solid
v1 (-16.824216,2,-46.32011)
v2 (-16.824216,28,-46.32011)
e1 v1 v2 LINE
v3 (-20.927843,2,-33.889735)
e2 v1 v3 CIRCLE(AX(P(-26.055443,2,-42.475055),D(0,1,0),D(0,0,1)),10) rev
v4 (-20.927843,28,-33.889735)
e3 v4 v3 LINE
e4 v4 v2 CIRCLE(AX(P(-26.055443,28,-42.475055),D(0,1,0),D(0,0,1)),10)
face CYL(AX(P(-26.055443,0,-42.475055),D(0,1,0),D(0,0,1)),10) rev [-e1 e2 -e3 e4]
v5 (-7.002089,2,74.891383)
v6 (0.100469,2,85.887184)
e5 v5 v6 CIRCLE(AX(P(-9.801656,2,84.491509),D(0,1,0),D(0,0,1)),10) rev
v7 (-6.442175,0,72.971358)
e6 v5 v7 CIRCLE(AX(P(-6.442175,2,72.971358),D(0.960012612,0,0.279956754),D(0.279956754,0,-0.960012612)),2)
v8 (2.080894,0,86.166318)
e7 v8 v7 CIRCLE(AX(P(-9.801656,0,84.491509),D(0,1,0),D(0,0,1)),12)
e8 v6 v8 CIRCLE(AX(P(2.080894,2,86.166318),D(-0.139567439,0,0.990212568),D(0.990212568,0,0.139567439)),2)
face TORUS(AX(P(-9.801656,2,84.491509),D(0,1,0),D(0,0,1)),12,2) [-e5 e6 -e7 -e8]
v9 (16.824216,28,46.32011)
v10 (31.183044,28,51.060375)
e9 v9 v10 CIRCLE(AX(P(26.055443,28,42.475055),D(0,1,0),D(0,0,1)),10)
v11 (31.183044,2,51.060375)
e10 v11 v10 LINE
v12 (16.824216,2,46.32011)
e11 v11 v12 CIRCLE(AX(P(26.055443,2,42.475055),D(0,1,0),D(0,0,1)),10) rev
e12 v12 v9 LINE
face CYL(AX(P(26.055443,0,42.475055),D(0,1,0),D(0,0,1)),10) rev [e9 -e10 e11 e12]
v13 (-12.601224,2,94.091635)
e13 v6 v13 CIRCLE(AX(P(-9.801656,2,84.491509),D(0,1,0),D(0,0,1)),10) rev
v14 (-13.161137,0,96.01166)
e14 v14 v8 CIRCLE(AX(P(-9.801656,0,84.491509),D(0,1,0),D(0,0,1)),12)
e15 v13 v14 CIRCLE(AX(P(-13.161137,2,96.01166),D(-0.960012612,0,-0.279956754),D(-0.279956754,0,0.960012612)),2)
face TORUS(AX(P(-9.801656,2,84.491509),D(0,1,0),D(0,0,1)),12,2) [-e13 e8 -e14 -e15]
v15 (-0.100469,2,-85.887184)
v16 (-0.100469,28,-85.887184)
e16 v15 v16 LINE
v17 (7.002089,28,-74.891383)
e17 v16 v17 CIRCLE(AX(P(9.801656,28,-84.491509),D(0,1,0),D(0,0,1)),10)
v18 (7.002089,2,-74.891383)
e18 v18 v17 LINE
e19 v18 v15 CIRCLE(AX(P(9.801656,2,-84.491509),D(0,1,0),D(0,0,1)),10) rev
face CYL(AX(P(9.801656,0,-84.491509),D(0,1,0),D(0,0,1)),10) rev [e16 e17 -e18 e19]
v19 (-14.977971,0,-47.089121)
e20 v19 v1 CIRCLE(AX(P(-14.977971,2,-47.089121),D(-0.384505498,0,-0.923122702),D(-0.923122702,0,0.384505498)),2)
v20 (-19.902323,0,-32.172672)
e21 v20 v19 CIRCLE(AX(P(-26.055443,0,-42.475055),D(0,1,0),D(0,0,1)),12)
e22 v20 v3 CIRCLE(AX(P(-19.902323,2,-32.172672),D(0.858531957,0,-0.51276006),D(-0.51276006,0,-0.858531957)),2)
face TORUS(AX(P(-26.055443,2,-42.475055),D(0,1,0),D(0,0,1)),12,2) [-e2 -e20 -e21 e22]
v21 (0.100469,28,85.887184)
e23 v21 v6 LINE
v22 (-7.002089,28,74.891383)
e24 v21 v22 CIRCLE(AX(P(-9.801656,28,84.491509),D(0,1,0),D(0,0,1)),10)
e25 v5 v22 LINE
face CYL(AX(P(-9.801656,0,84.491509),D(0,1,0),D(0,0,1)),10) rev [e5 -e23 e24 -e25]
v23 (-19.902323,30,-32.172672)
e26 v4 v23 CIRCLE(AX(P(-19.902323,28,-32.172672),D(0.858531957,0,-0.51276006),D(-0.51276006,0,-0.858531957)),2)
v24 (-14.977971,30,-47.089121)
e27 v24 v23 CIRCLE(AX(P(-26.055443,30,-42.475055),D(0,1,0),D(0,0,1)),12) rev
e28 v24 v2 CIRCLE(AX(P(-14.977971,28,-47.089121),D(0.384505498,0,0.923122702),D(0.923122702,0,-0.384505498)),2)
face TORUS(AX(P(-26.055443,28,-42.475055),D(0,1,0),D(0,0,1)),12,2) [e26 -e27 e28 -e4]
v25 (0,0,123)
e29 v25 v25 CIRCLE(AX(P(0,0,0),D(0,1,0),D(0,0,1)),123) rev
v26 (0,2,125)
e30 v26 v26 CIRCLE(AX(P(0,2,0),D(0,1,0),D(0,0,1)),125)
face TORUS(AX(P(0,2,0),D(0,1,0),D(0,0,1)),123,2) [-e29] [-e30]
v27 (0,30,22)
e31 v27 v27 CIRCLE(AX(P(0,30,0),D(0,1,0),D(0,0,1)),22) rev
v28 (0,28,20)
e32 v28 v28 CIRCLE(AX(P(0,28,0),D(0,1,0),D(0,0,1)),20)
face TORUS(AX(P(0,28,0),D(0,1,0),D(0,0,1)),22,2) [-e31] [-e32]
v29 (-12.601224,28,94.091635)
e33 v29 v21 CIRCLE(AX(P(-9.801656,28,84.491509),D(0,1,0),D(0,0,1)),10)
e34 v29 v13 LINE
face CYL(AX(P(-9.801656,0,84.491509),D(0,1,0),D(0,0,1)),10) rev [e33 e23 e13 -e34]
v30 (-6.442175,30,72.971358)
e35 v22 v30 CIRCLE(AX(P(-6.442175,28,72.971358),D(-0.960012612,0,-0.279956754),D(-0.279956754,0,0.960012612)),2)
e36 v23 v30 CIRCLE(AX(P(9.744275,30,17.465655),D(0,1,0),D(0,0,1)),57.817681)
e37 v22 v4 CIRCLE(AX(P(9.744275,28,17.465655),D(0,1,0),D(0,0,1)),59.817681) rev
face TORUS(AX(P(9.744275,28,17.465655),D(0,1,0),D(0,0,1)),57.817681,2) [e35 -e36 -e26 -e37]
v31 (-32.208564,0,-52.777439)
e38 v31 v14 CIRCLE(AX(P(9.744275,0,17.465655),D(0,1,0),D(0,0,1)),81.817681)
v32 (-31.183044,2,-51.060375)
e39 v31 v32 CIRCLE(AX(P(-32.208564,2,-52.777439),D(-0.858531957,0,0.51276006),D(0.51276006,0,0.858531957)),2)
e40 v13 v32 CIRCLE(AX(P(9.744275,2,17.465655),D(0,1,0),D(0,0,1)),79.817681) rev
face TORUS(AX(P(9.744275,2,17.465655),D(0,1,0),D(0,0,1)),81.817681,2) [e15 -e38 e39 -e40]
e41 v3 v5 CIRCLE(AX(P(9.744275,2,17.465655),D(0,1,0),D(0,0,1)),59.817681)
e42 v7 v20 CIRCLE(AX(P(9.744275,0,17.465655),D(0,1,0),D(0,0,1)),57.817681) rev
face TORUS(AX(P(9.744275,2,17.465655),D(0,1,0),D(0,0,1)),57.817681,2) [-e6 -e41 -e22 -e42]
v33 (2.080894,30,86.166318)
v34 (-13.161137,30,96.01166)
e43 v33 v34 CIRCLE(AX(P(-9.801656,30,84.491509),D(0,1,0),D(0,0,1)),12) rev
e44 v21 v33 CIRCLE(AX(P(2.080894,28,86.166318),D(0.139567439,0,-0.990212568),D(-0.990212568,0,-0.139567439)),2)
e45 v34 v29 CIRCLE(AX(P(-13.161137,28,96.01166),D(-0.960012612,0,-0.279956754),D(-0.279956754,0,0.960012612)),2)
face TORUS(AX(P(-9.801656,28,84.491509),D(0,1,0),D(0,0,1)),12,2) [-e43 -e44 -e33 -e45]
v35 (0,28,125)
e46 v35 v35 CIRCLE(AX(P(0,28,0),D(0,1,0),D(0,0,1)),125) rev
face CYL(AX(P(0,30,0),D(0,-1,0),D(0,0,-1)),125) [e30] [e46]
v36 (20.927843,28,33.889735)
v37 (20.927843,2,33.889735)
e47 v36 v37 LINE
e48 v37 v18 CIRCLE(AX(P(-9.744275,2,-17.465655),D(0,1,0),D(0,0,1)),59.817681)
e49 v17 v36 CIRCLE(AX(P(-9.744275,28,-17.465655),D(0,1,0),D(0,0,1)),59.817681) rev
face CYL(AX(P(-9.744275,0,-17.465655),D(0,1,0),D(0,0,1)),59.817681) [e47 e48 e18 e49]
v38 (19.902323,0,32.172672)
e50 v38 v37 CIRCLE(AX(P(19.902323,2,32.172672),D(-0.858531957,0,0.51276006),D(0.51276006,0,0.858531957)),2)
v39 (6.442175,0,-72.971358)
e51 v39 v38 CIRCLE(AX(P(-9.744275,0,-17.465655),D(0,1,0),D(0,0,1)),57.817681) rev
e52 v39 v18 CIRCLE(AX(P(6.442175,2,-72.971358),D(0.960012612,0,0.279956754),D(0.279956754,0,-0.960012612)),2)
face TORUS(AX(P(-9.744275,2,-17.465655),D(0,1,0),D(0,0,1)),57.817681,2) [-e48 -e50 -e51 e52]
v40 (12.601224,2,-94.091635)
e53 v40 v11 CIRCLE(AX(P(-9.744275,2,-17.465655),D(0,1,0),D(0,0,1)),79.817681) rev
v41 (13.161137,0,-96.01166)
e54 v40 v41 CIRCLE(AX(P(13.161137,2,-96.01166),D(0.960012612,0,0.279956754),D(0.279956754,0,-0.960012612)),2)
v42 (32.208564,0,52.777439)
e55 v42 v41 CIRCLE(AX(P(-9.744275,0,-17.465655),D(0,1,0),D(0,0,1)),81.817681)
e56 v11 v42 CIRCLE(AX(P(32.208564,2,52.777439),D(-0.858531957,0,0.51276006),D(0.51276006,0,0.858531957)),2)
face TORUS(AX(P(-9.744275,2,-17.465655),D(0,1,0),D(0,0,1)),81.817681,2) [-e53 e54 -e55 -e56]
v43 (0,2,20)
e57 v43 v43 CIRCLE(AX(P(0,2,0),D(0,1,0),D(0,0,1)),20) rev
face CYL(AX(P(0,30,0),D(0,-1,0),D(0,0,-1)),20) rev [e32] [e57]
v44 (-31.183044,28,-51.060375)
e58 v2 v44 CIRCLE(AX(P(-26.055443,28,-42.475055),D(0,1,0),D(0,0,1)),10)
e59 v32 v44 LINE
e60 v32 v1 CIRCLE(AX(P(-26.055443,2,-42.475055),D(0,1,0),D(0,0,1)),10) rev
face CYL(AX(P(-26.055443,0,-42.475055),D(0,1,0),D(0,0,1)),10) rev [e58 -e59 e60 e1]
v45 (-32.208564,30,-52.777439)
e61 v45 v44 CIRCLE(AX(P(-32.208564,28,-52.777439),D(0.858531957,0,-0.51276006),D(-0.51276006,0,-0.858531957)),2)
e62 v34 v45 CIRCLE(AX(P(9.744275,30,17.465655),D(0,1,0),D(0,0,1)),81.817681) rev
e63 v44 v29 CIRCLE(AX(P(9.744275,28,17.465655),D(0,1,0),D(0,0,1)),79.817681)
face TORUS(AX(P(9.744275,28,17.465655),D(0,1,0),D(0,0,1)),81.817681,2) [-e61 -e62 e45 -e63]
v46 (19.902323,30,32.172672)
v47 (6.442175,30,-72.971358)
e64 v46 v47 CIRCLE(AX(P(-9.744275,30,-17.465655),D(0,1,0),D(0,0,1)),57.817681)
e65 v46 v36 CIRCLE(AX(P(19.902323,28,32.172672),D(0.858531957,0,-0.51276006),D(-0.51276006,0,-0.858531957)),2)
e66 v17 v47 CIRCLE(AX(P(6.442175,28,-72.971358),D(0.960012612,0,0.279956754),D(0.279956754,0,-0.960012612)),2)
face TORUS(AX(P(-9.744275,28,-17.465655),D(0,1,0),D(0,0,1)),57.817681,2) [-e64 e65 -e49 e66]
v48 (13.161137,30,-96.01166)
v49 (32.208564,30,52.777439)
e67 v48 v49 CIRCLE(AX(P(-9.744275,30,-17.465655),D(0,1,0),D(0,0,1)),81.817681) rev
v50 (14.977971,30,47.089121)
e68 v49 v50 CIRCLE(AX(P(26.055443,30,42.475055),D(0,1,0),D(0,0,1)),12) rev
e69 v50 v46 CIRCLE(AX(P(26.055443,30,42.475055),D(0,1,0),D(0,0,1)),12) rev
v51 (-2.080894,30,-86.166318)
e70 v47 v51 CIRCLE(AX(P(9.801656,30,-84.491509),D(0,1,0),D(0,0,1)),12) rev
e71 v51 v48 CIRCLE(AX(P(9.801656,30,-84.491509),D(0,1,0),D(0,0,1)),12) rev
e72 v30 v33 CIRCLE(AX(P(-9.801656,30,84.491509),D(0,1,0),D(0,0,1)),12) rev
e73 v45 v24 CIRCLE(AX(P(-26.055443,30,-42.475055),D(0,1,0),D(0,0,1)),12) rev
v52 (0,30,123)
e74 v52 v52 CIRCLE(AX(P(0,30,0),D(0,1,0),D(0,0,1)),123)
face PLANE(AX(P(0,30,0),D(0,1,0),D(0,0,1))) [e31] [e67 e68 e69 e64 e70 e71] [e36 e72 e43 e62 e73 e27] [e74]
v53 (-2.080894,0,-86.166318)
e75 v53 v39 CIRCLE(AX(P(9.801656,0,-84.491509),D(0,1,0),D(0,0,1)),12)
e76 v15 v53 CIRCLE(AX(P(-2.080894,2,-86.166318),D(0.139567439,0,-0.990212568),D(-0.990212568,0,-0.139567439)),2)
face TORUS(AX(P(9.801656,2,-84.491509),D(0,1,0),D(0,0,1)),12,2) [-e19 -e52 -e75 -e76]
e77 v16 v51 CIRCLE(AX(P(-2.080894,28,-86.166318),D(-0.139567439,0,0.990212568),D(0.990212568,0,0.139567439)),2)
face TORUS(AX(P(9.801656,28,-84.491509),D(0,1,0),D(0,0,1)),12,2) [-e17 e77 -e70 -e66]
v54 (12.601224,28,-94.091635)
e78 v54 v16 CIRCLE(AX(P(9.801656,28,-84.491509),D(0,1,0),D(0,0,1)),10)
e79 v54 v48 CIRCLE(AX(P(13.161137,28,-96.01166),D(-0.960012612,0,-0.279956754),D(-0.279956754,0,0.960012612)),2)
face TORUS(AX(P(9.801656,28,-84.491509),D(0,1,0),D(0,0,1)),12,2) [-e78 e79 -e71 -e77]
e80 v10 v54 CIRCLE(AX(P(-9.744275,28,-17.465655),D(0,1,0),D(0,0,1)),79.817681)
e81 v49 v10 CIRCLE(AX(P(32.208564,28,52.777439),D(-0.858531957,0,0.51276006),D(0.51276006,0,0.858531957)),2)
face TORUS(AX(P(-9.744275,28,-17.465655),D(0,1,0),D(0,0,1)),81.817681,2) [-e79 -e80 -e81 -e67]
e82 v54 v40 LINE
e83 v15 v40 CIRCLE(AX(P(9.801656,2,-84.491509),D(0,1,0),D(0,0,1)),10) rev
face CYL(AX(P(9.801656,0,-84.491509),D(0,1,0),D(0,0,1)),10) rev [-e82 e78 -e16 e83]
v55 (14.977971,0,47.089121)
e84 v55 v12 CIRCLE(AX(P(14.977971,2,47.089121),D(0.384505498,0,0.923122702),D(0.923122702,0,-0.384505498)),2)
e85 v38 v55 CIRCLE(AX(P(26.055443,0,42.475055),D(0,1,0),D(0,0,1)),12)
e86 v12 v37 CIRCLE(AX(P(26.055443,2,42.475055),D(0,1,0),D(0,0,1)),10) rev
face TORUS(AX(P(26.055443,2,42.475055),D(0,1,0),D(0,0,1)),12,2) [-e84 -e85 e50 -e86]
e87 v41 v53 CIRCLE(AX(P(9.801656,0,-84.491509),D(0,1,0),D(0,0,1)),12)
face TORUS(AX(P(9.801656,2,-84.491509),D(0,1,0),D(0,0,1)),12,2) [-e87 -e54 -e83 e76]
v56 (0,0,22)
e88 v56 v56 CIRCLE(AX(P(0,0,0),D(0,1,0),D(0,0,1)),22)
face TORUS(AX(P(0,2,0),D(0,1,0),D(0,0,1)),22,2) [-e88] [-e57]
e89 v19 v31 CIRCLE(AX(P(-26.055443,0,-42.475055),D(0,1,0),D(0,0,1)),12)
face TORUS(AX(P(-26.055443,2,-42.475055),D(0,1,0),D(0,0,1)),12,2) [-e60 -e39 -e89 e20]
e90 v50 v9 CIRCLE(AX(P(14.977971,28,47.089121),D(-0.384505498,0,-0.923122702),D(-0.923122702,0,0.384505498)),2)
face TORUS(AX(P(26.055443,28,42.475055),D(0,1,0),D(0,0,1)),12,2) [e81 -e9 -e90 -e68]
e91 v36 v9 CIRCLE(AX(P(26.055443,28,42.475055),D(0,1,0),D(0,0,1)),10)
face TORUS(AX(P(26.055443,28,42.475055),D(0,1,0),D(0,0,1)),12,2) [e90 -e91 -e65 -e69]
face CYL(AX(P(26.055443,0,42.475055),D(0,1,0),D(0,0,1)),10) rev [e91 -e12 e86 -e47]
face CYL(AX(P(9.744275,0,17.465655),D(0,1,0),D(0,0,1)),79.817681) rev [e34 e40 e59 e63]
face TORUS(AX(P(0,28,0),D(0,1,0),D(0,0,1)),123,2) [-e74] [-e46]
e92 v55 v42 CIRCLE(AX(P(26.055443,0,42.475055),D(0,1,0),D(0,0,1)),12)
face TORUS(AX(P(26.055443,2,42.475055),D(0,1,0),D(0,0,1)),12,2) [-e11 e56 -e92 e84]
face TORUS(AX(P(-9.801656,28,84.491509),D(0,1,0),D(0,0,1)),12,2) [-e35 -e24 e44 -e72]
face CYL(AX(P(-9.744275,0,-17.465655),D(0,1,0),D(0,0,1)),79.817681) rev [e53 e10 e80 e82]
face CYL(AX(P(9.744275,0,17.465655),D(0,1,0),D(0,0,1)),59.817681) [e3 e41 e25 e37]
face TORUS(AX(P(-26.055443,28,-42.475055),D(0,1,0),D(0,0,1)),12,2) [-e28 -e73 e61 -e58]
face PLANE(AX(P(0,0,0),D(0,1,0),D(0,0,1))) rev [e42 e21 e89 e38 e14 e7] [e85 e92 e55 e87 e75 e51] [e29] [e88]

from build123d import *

# Parameters (mm, degrees)
SKETCH_1_R          = 125
SKETCH_1_R_2        = 20
EXTRUDE_1_DEPTH     = 30
CUT_EXTRUDE_1_DEPTH = 30
FILLET_3_R          = 10
FILLET_4_R          = 2


with BuildPart() as part:
    # 草图1 → 凸台-拉伸1 (new body)
    with BuildSketch(Plane(origin=(0, 0, 0), x_dir=(1, 0, 0), z_dir=(0, 1, 0))):
        with Locations(Location((0, 0, 0), (0, 0, 270))):
            Circle(SKETCH_1_R)
        with Locations(Location((0, 0, 0), (0, 0, 270))):
            Circle(SKETCH_1_R_2, mode=Mode.SUBTRACT)
    extrude(amount=EXTRUDE_1_DEPTH)

    # 草图2 → 切除-拉伸1 (cut)
    with BuildSketch(Plane(origin=(0, 30, 0), x_dir=(1, 0, 0), z_dir=(0, 1, 0))):
        with BuildLine():
            Line((1.395674395, 96.50212568), (-1.395674395, 76.69787432))
            ThreePointArc((-1.395674395, 76.69787432), (49.589198145, 25.061305382), (13.255952188, -37.753404024))
            Line((13.255952188, -37.753404024), (20.946062145, -56.215858055))
            ThreePointArc((20.946062145, -56.215858055), (69.427303642, 27.600905796), (1.395674395, 96.50212568))
        make_face()
        with BuildLine():
            Line((-13.255952188, 37.753404024), (-20.946062145, 56.215858055))
            ThreePointArc((-20.946062145, 56.215858055), (-69.427303642, -27.600905796), (-1.395674395, -96.50212568))
            Line((-1.395674395, -96.50212568), (1.395674395, -76.69787432))
            ThreePointArc((1.395674395, -76.69787432), (-49.589198145, -25.061305382), (-13.255952188, 37.753404024))
        make_face()
    extrude(amount=-CUT_EXTRUDE_1_DEPTH, mode=Mode.SUBTRACT)

    # 圆角3
    fillet_3_edges = [part.edges().sort_by_distance(p)[0] for p in [
        (-20.946062145, 15, -56.215858055),
        (-13.255952188, 15, -37.753404024),
        (-1.395674395, 15, 96.50212568),
        (1.395674395, 15, 76.69787432),
        (20.946062145, 15, 56.215858055),
        (13.255952188, 15, 37.753404024),
        (-1.395674395, 15, -76.69787432),
        (1.395674395, 15, -96.50212568),
    ]]
    fillet(fillet_3_edges, radius=FILLET_3_R - 0.0001)  # a hair under: the kernel refuses the full size

    # 圆角4
    fillet_4_edges = [part.edges().sort_by_distance(p)[0] for p in [
        (0, 0, -125),
        (-69.427303642, 30, 27.600905796),
        (-69.427303642, 0, 27.600905796),
        (-49.589198145, 30, 25.061305382),
        (-49.589198145, 0, 25.061305382),
        (69.427303642, 30, -27.600905796),
        (69.427303642, 0, -27.600905796),
        (49.589198145, 30, -25.061305382),
        (49.589198145, 0, -25.061305382),
        (0, 30, -125),
        (-22.920540142, 30, -51.971024611),
        (0, 0, -20),
        (-22.920540142, 0, -51.971024611),
        (-16.559492515, 30, -39.340160323),
        (-16.559492515, 0, -39.340160323),
        (-4.375771536, 30, 92.891558501),
        (-4.375771536, 0, 92.891558501),
        (-1.401623113, 30, 79.065637167),
        (-1.401623113, 0, 79.065637167),
        (0, 30, -20),
        (22.920540142, 30, 51.971024611),
        (22.920540142, 0, 51.971024611),
        (16.559492515, 30, 39.340160323),
        (16.559492515, 0, 39.340160323),
        (1.401623113, 30, -79.065637167),
        (1.401623113, 0, -79.065637167),
        (4.375771536, 30, -92.891558501),
        (4.375771536, 0, -92.891558501),
    ]]
    fillet(fillet_4_edges, radius=FILLET_4_R)


solid = part.part
